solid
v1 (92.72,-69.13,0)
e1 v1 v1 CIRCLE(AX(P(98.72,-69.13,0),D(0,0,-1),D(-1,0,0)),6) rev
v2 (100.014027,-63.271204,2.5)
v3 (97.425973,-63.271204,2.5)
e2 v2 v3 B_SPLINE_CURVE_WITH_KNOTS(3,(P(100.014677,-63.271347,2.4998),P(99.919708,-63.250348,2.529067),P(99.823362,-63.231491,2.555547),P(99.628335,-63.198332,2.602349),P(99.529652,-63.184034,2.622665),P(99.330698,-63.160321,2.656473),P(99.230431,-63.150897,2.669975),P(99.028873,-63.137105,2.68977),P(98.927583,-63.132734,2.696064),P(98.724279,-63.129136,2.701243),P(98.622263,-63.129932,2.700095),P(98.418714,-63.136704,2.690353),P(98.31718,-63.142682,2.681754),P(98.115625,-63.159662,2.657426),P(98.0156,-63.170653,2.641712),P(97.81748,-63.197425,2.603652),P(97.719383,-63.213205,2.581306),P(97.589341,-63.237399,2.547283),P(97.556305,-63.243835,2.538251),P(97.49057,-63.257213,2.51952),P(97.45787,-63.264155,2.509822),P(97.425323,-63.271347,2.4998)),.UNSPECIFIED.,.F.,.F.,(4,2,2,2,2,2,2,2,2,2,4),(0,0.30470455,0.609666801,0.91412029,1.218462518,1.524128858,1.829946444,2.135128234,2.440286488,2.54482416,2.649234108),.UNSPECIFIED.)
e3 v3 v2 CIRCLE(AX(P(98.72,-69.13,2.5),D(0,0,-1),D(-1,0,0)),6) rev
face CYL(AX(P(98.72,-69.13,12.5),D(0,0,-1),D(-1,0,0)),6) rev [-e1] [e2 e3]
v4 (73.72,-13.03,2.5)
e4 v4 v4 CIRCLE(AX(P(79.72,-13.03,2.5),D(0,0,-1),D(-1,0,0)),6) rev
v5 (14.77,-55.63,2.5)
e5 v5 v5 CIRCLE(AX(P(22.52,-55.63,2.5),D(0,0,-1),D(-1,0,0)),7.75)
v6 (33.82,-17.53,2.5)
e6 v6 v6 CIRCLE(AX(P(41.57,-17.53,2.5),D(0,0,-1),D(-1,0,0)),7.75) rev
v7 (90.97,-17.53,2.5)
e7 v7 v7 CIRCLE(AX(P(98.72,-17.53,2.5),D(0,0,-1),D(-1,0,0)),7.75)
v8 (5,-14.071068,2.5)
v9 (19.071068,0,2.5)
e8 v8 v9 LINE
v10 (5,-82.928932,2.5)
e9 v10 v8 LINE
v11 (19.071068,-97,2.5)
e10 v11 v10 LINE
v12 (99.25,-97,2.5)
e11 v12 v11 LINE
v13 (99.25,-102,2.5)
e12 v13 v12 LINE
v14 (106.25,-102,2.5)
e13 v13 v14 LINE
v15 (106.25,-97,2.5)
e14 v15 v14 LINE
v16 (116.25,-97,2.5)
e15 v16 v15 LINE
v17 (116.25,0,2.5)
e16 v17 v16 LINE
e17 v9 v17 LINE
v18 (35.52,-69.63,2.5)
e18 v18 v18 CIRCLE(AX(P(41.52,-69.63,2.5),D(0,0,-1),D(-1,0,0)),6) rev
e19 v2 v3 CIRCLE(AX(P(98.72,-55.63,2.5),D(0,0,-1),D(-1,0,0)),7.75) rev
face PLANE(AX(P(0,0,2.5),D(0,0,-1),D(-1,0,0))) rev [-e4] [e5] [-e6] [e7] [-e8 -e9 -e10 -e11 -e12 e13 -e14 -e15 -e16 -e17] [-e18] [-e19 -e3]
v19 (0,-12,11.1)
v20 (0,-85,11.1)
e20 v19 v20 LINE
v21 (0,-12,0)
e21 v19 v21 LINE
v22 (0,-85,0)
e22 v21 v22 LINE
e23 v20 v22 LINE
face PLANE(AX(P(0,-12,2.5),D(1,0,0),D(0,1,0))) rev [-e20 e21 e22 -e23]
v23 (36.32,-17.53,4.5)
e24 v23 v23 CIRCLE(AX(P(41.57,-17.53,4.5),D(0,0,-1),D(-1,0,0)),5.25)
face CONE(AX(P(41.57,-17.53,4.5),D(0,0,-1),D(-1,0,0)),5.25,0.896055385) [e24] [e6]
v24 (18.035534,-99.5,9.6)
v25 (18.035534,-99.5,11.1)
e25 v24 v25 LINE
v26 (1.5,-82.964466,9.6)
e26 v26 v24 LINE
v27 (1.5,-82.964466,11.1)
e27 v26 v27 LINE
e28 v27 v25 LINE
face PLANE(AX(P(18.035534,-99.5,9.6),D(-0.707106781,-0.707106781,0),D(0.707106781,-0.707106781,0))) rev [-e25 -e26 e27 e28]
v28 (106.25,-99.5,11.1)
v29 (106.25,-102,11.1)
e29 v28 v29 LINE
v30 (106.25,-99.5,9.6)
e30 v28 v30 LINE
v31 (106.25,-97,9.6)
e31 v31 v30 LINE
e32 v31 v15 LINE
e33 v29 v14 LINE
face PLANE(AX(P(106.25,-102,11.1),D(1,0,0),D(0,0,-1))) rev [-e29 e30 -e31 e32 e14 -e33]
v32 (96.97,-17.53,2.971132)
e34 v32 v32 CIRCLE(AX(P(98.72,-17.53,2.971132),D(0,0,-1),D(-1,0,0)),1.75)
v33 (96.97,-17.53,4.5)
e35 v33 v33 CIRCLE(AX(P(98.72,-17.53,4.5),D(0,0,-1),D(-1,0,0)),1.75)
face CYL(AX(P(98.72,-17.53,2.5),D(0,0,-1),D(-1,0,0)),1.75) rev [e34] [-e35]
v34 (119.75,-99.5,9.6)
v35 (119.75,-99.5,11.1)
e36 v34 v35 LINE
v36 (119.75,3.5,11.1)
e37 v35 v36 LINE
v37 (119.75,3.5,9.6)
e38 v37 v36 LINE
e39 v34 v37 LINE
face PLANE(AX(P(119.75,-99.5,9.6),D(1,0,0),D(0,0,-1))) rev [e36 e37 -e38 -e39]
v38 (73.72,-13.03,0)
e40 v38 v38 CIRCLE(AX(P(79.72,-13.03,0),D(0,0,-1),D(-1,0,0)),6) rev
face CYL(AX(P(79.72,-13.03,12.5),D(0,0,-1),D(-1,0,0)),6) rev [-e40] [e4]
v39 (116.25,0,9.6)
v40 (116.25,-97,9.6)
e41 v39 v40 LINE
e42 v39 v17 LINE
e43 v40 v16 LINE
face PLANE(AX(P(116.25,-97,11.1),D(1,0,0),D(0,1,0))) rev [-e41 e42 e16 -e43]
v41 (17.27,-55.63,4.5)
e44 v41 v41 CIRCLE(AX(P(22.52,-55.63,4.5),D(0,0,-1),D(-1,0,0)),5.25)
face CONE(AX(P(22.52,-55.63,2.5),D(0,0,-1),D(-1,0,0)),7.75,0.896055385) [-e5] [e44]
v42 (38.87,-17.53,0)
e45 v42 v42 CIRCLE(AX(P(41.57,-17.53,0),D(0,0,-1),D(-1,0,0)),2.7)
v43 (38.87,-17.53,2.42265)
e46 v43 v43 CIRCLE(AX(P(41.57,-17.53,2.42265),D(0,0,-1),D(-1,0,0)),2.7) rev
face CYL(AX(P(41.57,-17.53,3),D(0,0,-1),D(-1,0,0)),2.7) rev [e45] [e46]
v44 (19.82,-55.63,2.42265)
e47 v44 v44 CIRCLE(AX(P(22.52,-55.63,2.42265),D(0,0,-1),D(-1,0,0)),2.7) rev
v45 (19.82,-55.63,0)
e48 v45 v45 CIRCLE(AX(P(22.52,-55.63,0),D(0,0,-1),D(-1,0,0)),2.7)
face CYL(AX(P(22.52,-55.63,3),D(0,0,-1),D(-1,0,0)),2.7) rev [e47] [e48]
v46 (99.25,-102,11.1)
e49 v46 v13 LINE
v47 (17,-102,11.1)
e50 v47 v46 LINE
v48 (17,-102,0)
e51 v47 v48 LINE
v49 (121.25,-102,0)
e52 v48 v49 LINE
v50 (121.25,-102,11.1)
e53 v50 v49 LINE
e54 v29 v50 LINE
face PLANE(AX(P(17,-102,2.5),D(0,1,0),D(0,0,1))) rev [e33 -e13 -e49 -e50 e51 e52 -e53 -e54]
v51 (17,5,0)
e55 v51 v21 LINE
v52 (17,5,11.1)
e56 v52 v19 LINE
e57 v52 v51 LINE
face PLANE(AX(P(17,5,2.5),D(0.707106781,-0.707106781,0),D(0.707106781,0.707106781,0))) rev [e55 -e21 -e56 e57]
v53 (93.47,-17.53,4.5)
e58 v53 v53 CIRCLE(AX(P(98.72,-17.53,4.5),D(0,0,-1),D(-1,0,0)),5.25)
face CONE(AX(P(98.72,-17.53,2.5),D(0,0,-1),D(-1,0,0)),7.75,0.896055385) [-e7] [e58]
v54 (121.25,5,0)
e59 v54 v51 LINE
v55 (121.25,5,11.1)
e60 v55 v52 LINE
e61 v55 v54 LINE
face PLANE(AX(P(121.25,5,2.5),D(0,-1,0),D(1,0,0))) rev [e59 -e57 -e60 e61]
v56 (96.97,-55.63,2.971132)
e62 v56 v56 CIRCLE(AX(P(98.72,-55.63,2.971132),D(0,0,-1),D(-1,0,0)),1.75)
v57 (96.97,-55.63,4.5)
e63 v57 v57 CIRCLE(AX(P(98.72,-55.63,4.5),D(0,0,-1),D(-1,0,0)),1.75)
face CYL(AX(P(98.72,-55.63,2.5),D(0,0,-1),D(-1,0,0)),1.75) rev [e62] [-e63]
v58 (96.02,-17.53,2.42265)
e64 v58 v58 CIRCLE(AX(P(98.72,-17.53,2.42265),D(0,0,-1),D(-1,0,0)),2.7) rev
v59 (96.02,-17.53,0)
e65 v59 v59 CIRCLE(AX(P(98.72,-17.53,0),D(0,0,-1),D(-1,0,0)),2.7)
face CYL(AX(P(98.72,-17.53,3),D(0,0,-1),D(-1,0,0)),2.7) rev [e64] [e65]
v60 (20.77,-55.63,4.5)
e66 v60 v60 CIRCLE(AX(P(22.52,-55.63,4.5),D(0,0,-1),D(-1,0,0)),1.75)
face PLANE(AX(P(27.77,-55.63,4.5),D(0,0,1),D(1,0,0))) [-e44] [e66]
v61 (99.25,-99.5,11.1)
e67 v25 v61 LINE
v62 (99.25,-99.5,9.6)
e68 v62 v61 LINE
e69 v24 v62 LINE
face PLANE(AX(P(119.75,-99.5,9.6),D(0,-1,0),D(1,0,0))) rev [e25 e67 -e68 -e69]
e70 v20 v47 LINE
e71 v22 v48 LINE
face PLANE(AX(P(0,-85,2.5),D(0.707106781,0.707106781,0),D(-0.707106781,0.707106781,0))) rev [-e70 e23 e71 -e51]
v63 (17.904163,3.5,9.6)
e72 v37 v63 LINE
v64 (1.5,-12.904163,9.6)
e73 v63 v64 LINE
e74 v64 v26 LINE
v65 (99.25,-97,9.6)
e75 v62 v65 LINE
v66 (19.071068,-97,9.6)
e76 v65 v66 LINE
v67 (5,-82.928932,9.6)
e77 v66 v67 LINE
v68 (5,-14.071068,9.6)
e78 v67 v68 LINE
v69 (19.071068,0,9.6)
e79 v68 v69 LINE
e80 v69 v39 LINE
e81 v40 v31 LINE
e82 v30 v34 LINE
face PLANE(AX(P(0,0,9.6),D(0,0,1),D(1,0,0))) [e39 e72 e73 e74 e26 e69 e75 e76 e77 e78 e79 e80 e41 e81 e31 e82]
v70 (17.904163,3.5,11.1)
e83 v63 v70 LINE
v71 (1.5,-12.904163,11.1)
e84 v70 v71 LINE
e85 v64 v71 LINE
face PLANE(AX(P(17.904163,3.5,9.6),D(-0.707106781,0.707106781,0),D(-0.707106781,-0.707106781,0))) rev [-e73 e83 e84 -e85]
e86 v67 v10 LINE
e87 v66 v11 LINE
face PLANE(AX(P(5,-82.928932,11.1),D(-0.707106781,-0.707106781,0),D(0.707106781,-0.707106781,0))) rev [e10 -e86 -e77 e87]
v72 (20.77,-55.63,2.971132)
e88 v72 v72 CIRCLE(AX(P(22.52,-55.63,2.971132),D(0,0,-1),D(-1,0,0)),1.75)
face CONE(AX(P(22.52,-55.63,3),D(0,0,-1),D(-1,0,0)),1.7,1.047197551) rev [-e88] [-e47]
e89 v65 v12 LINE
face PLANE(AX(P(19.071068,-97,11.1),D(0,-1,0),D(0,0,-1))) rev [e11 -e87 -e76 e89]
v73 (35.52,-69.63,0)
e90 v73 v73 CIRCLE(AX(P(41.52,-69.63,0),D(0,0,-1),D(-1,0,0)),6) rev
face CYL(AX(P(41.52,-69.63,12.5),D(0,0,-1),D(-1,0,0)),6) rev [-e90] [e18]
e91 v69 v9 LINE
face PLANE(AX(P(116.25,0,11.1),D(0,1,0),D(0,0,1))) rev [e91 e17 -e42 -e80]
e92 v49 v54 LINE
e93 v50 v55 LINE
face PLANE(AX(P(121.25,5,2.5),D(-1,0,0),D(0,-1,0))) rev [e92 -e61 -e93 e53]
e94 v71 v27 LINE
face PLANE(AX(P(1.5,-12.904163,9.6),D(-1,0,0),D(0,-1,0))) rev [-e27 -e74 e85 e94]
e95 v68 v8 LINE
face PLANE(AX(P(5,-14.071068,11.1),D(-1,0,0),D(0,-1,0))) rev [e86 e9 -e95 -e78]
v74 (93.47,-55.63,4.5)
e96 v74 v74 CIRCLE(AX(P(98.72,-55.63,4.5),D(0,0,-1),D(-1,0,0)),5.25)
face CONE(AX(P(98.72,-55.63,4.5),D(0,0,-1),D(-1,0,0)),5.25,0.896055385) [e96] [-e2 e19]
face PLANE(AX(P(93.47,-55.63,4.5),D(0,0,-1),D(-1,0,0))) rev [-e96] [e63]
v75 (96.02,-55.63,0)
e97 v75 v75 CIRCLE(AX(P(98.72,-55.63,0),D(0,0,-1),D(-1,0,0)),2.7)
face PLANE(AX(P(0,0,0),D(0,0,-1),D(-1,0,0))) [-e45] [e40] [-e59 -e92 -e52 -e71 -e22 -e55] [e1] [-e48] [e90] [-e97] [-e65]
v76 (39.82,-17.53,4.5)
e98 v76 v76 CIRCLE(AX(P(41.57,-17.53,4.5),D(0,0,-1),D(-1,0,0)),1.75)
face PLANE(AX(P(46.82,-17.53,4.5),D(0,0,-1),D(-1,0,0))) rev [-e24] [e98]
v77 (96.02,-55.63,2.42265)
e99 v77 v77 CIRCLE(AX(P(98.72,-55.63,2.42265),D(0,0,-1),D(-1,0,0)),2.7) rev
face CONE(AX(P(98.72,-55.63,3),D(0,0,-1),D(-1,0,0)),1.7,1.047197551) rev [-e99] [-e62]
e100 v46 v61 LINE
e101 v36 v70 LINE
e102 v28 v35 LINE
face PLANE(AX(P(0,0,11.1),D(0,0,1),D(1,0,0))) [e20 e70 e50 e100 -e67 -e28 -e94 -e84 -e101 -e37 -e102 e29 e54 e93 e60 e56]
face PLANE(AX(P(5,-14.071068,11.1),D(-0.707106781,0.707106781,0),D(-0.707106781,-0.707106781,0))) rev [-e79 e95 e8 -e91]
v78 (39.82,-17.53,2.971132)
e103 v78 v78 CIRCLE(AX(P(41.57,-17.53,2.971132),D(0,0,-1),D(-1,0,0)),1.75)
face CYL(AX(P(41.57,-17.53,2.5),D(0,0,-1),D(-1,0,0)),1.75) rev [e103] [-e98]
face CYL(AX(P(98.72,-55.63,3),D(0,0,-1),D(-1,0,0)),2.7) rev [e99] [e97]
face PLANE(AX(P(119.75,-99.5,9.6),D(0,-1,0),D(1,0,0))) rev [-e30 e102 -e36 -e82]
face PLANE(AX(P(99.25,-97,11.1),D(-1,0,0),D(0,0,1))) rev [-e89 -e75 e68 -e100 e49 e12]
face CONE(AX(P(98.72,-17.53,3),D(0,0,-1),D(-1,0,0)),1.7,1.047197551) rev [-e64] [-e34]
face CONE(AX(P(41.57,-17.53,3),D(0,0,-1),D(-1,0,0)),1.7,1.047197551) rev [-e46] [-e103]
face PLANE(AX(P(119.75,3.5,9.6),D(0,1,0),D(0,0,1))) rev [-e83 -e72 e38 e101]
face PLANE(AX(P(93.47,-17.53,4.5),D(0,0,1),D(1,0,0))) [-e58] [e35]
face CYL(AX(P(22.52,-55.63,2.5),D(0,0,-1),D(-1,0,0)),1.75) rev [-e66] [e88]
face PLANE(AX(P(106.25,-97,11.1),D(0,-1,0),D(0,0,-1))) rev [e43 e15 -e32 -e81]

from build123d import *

# Parameters (mm, degrees)
BOSS_EXTRU_1_DEPTH           = 2.5
BOSS_EXTRU_2_DEPTH           = 8.6
ESQUISSE15_W                 = 1.8
ESQUISSE15_H                 = 2.5
D_GAGEMENT_M31_AT_2_COUNT    = 2
D_GAGEMENT_M31_AT_2_PITCH    = 76.2
D_GAGEMENT_M31_AT_3_COUNT    = 2
D_GAGEMENT_M31_AT_3_PITCH    = 38.1
D_GAGEMENT_M31_AT_4_COUNT    = 2
D_GAGEMENT_M31_AT_4_PITCH    = 68.685751798
ESQUISSE16_R                 = 2.7
ENL_V_MAT_EXTRU_2_DEPTH      = 3
ENL_V_MAT_EXTRU_3_DEPTH      = 1.5
ENL_V_MAT_EXTRU_4_DEPTH      = 10
ENL_V_MAT_EXTRU_4_DEPTH_BACK = 10
ESQUISSE20_R                 = 6
CHANFREIN3_SIZE              = 0.577350269
CHANFREIN3_SIZE_2            = 1


with BuildPart() as part:
    # Esquisse1 → Boss.-Extru.1 (new body)
    with BuildSketch(Plane.XY):
        Polygon((0, -85), (17, -102), (121.25, -102), (121.25, 5), (17, 5), (0, -12), align=None)
    extrude(amount=BOSS_EXTRU_1_DEPTH)

    # Esquisse2 → Boss.-Extru.2 (add)
    with BuildSketch(Plane.XY.offset(2.5)):
        Polygon((5, -82.928932188), (19.071067812, -97), (99.25, -97), (99.25, -102), (17, -102), (0, -85), (0, -12), (17, 5), (121.25, 5), (121.25, -102), (106.25, -102), (106.25, -97), (116.25, -97), (116.25, 0), (19.071067812, 0), (5, -14.071067812), align=None)
    extrude(amount=BOSS_EXTRU_2_DEPTH)

    # Esquisse9 → Révolution1 (revolve)
    with BuildSketch(Plane(origin=(0, -55.63, 0), x_dir=(-1, 0, 0), z_dir=(0, -1, 0))):
        Polygon((-96.97, -2.5), (-90.97, -2.5), (-93.47, -4.5), (-96.97, -4.5), align=None)
    revolve(axis=Axis((98.72, -55.63, 2.5), (0, 0, 1)))

    # Esquisse11 → Révolution2 (revolve)
    with BuildSketch(Plane(origin=(0, -55.63, 0), x_dir=(-1, 0, 0), z_dir=(0, -1, 0)), mode=Mode.PRIVATE) as r_volution2_sk:
        Polygon((-24.27, -2.5), (-30.27, -2.5), (-27.77, -4.5), (-24.27, -4.5), align=None)
    revolve(r_volution2_sk.sketch.rotate(Axis((22.52, -55.63, 2.5), (0, 0, 1)), 180), axis=Axis((22.52, -55.63, 2.5), (0, 0, 1)))

    # Esquisse12 → Révolution3 (revolve)
    with BuildSketch(Plane(origin=(0, -17.53, 0), x_dir=(1, 0, 0), z_dir=(0, 1, 0))):
        Polygon((96.97, -2.5), (90.97, -2.5), (93.47, -4.5), (96.97, -4.5), align=None)
    revolve(axis=Axis((98.72, -17.53, 2.5), (0, 0, 1)))

    # Esquisse13 → Révolution4 (revolve)
    with BuildSketch(Plane(origin=(0, -17.53, 0), x_dir=(1, 0, 0), z_dir=(0, 1, 0)), mode=Mode.PRIVATE) as r_volution4_sk:
        Polygon((43.32, -2.5), (49.32, -2.5), (46.82, -4.5), (43.32, -4.5), align=None)
    revolve(r_volution4_sk.sketch.rotate(Axis((41.57, -17.53, 2.5), (0, 0, 1)), 180), axis=Axis((41.57, -17.53, 2.5), (0, 0, 1)))

    # Esquisse15 → Dégagement M31 (revolve, cut)
    with BuildSketch(Plane(origin=(98.72, -55.63, 2.5), x_dir=(0, -1, 0), z_dir=(1, 0, 0))):
        with Locations((0.9, 1.25)):
            Rectangle(ESQUISSE15_W, ESQUISSE15_H)
    d_gagement_m31 = revolve(axis=Axis((98.72, -55.63, 8.85), (0, 0, -1)), mode=Mode.SUBTRACT)

    # Dégagement M31 at 2: Dégagement M31 ×2
    with Locations(*[(-i * D_GAGEMENT_M31_AT_2_PITCH, 0, 0) for i in range(1, D_GAGEMENT_M31_AT_2_COUNT)]):
        add(d_gagement_m31, mode=Mode.SUBTRACT)

    # Dégagement M31 at 3: Dégagement M31 ×2
    with Locations(*[(0, i * D_GAGEMENT_M31_AT_3_PITCH, 0) for i in range(1, D_GAGEMENT_M31_AT_3_COUNT)]):
        add(d_gagement_m31, mode=Mode.SUBTRACT)

    # Dégagement M31 at 4: Dégagement M31 ×2
    with Locations(*[Vector(-0.8320502943378437, 0.5547001962252291, 0) * (i * D_GAGEMENT_M31_AT_4_PITCH) for i in range(1, D_GAGEMENT_M31_AT_4_COUNT)]):
        add(d_gagement_m31, mode=Mode.SUBTRACT)

    # Esquisse16 → Enlèv. mat.-Extru.2 (cut)
    with BuildSketch(Plane(origin=(0, 0, 0), x_dir=(-1, 0, 0), z_dir=(0, 0, -1))):
        with Locations((-22.52, -55.63)):
            Circle(ESQUISSE16_R)
        with Locations((-98.72, -55.63)):
            Circle(ESQUISSE16_R)
        with Locations((-98.72, -17.53)):
            Circle(ESQUISSE16_R)
        with Locations((-41.57, -17.53)):
            Circle(ESQUISSE16_R)
    extrude(amount=-ENL_V_MAT_EXTRU_2_DEPTH, mode=Mode.SUBTRACT)

    # Esquisse17 → Enlèv. mat.-Extru.3 (cut)
    with BuildSketch(Plane.XY.offset(11.1)):
        Polygon((119.75, -99.5), (119.75, 3.5), (17.904163056, 3.5), (1.5, -12.904163056), (1.5, -82.964466094), (18.035533906, -99.5), align=None)
    extrude(amount=-ENL_V_MAT_EXTRU_3_DEPTH, mode=Mode.SUBTRACT)

    # Esquisse20 → Enlèv. mat.-Extru.4 (cut, two sides: drawn at the far end of the back side and taken through both)
    with BuildSketch(Plane.XY.offset(2.5).offset(-ENL_V_MAT_EXTRU_4_DEPTH_BACK)):
        with Locations(Location((98.72, -69.13, 0), (0, 0, 180))):
            Circle(ESQUISSE20_R)
        with Locations(Location((41.52, -69.63, 0), (0, 0, 180))):
            Circle(ESQUISSE20_R)
        with Locations(Location((79.72, -13.03, 0), (0, 0, 180))):
            Circle(ESQUISSE20_R)
    extrude(amount=ENL_V_MAT_EXTRU_4_DEPTH + ENL_V_MAT_EXTRU_4_DEPTH_BACK, mode=Mode.SUBTRACT)

    # Chanfrein3
    # the kernel refuses this chamfer: 1, 0.577350269 mm, written as the material it adds along each edge
    with BuildSketch(Plane(origin=(41.57, -17.53, 3), x_dir=(-1, 0, 0), z_dir=(0, -1, 0))) as chanfrein3_piece_1_section:
        Polygon((2.7, CHANFREIN3_SIZE), (2.7 - CHANFREIN3_SIZE_2, 0), (2.7, 0), align=None)
    chanfrein3_piece_1 = revolve(axis=Axis((41.57, -17.53, 3), (0, 0, -1)), mode=Mode.PRIVATE)
    chanfrein3_piece_1 = chanfrein3_piece_1 - Plane(origin=(41.57, -17.53, 2.701530762), x_dir=(-1, 0, 0), z_dir=(0, 0, -1)) * Cylinder(1.75, 11, mode=Mode.PRIVATE)
    add(chanfrein3_piece_1)
    with BuildSketch(Plane(origin=(98.72, -17.53, 3), x_dir=(-1, 0, 0), z_dir=(0, -1, 0))) as chanfrein3_piece_2_section:
        Polygon((2.7, CHANFREIN3_SIZE), (2.7 - CHANFREIN3_SIZE_2, 0), (2.7, 0), align=None)
    chanfrein3_piece_2 = revolve(axis=Axis((98.72, -17.53, 3), (0, 0, -1)), mode=Mode.PRIVATE)
    chanfrein3_piece_2 = chanfrein3_piece_2 - Plane(origin=(98.72, -17.53, 2.701530762), x_dir=(-1, 0, 0), z_dir=(0, 0, -1)) * Cylinder(1.75, 11, mode=Mode.PRIVATE)
    add(chanfrein3_piece_2)
    with BuildSketch(Plane(origin=(98.72, -55.63, 3), x_dir=(-1, 0, 0), z_dir=(0, -1, 0))) as chanfrein3_piece_3_section:
        Polygon((2.7, CHANFREIN3_SIZE), (2.7 - CHANFREIN3_SIZE_2, 0), (2.7, 0), align=None)
    chanfrein3_piece_3 = revolve(axis=Axis((98.72, -55.63, 3), (0, 0, -1)), mode=Mode.PRIVATE)
    chanfrein3_piece_3 = chanfrein3_piece_3 - Plane(origin=(98.72, -55.63, 2.701530762), x_dir=(-1, 0, 0), z_dir=(0, 0, -1)) * Cylinder(1.75, 11, mode=Mode.PRIVATE)
    add(chanfrein3_piece_3)
    with BuildSketch(Plane(origin=(22.52, -55.63, 3), x_dir=(-1, 0, 0), z_dir=(0, -1, 0))) as chanfrein3_piece_4_section:
        Polygon((2.7, CHANFREIN3_SIZE), (2.7 - CHANFREIN3_SIZE_2, 0), (2.7, 0), align=None)
    chanfrein3_piece_4 = revolve(axis=Axis((22.52, -55.63, 3), (0, 0, -1)), mode=Mode.PRIVATE)
    chanfrein3_piece_4 = chanfrein3_piece_4 - Plane(origin=(22.52, -55.63, 2.701530762), x_dir=(-1, 0, 0), z_dir=(0, 0, -1)) * Cylinder(1.75, 11, mode=Mode.PRIVATE)
    add(chanfrein3_piece_4)


solid = part.part
